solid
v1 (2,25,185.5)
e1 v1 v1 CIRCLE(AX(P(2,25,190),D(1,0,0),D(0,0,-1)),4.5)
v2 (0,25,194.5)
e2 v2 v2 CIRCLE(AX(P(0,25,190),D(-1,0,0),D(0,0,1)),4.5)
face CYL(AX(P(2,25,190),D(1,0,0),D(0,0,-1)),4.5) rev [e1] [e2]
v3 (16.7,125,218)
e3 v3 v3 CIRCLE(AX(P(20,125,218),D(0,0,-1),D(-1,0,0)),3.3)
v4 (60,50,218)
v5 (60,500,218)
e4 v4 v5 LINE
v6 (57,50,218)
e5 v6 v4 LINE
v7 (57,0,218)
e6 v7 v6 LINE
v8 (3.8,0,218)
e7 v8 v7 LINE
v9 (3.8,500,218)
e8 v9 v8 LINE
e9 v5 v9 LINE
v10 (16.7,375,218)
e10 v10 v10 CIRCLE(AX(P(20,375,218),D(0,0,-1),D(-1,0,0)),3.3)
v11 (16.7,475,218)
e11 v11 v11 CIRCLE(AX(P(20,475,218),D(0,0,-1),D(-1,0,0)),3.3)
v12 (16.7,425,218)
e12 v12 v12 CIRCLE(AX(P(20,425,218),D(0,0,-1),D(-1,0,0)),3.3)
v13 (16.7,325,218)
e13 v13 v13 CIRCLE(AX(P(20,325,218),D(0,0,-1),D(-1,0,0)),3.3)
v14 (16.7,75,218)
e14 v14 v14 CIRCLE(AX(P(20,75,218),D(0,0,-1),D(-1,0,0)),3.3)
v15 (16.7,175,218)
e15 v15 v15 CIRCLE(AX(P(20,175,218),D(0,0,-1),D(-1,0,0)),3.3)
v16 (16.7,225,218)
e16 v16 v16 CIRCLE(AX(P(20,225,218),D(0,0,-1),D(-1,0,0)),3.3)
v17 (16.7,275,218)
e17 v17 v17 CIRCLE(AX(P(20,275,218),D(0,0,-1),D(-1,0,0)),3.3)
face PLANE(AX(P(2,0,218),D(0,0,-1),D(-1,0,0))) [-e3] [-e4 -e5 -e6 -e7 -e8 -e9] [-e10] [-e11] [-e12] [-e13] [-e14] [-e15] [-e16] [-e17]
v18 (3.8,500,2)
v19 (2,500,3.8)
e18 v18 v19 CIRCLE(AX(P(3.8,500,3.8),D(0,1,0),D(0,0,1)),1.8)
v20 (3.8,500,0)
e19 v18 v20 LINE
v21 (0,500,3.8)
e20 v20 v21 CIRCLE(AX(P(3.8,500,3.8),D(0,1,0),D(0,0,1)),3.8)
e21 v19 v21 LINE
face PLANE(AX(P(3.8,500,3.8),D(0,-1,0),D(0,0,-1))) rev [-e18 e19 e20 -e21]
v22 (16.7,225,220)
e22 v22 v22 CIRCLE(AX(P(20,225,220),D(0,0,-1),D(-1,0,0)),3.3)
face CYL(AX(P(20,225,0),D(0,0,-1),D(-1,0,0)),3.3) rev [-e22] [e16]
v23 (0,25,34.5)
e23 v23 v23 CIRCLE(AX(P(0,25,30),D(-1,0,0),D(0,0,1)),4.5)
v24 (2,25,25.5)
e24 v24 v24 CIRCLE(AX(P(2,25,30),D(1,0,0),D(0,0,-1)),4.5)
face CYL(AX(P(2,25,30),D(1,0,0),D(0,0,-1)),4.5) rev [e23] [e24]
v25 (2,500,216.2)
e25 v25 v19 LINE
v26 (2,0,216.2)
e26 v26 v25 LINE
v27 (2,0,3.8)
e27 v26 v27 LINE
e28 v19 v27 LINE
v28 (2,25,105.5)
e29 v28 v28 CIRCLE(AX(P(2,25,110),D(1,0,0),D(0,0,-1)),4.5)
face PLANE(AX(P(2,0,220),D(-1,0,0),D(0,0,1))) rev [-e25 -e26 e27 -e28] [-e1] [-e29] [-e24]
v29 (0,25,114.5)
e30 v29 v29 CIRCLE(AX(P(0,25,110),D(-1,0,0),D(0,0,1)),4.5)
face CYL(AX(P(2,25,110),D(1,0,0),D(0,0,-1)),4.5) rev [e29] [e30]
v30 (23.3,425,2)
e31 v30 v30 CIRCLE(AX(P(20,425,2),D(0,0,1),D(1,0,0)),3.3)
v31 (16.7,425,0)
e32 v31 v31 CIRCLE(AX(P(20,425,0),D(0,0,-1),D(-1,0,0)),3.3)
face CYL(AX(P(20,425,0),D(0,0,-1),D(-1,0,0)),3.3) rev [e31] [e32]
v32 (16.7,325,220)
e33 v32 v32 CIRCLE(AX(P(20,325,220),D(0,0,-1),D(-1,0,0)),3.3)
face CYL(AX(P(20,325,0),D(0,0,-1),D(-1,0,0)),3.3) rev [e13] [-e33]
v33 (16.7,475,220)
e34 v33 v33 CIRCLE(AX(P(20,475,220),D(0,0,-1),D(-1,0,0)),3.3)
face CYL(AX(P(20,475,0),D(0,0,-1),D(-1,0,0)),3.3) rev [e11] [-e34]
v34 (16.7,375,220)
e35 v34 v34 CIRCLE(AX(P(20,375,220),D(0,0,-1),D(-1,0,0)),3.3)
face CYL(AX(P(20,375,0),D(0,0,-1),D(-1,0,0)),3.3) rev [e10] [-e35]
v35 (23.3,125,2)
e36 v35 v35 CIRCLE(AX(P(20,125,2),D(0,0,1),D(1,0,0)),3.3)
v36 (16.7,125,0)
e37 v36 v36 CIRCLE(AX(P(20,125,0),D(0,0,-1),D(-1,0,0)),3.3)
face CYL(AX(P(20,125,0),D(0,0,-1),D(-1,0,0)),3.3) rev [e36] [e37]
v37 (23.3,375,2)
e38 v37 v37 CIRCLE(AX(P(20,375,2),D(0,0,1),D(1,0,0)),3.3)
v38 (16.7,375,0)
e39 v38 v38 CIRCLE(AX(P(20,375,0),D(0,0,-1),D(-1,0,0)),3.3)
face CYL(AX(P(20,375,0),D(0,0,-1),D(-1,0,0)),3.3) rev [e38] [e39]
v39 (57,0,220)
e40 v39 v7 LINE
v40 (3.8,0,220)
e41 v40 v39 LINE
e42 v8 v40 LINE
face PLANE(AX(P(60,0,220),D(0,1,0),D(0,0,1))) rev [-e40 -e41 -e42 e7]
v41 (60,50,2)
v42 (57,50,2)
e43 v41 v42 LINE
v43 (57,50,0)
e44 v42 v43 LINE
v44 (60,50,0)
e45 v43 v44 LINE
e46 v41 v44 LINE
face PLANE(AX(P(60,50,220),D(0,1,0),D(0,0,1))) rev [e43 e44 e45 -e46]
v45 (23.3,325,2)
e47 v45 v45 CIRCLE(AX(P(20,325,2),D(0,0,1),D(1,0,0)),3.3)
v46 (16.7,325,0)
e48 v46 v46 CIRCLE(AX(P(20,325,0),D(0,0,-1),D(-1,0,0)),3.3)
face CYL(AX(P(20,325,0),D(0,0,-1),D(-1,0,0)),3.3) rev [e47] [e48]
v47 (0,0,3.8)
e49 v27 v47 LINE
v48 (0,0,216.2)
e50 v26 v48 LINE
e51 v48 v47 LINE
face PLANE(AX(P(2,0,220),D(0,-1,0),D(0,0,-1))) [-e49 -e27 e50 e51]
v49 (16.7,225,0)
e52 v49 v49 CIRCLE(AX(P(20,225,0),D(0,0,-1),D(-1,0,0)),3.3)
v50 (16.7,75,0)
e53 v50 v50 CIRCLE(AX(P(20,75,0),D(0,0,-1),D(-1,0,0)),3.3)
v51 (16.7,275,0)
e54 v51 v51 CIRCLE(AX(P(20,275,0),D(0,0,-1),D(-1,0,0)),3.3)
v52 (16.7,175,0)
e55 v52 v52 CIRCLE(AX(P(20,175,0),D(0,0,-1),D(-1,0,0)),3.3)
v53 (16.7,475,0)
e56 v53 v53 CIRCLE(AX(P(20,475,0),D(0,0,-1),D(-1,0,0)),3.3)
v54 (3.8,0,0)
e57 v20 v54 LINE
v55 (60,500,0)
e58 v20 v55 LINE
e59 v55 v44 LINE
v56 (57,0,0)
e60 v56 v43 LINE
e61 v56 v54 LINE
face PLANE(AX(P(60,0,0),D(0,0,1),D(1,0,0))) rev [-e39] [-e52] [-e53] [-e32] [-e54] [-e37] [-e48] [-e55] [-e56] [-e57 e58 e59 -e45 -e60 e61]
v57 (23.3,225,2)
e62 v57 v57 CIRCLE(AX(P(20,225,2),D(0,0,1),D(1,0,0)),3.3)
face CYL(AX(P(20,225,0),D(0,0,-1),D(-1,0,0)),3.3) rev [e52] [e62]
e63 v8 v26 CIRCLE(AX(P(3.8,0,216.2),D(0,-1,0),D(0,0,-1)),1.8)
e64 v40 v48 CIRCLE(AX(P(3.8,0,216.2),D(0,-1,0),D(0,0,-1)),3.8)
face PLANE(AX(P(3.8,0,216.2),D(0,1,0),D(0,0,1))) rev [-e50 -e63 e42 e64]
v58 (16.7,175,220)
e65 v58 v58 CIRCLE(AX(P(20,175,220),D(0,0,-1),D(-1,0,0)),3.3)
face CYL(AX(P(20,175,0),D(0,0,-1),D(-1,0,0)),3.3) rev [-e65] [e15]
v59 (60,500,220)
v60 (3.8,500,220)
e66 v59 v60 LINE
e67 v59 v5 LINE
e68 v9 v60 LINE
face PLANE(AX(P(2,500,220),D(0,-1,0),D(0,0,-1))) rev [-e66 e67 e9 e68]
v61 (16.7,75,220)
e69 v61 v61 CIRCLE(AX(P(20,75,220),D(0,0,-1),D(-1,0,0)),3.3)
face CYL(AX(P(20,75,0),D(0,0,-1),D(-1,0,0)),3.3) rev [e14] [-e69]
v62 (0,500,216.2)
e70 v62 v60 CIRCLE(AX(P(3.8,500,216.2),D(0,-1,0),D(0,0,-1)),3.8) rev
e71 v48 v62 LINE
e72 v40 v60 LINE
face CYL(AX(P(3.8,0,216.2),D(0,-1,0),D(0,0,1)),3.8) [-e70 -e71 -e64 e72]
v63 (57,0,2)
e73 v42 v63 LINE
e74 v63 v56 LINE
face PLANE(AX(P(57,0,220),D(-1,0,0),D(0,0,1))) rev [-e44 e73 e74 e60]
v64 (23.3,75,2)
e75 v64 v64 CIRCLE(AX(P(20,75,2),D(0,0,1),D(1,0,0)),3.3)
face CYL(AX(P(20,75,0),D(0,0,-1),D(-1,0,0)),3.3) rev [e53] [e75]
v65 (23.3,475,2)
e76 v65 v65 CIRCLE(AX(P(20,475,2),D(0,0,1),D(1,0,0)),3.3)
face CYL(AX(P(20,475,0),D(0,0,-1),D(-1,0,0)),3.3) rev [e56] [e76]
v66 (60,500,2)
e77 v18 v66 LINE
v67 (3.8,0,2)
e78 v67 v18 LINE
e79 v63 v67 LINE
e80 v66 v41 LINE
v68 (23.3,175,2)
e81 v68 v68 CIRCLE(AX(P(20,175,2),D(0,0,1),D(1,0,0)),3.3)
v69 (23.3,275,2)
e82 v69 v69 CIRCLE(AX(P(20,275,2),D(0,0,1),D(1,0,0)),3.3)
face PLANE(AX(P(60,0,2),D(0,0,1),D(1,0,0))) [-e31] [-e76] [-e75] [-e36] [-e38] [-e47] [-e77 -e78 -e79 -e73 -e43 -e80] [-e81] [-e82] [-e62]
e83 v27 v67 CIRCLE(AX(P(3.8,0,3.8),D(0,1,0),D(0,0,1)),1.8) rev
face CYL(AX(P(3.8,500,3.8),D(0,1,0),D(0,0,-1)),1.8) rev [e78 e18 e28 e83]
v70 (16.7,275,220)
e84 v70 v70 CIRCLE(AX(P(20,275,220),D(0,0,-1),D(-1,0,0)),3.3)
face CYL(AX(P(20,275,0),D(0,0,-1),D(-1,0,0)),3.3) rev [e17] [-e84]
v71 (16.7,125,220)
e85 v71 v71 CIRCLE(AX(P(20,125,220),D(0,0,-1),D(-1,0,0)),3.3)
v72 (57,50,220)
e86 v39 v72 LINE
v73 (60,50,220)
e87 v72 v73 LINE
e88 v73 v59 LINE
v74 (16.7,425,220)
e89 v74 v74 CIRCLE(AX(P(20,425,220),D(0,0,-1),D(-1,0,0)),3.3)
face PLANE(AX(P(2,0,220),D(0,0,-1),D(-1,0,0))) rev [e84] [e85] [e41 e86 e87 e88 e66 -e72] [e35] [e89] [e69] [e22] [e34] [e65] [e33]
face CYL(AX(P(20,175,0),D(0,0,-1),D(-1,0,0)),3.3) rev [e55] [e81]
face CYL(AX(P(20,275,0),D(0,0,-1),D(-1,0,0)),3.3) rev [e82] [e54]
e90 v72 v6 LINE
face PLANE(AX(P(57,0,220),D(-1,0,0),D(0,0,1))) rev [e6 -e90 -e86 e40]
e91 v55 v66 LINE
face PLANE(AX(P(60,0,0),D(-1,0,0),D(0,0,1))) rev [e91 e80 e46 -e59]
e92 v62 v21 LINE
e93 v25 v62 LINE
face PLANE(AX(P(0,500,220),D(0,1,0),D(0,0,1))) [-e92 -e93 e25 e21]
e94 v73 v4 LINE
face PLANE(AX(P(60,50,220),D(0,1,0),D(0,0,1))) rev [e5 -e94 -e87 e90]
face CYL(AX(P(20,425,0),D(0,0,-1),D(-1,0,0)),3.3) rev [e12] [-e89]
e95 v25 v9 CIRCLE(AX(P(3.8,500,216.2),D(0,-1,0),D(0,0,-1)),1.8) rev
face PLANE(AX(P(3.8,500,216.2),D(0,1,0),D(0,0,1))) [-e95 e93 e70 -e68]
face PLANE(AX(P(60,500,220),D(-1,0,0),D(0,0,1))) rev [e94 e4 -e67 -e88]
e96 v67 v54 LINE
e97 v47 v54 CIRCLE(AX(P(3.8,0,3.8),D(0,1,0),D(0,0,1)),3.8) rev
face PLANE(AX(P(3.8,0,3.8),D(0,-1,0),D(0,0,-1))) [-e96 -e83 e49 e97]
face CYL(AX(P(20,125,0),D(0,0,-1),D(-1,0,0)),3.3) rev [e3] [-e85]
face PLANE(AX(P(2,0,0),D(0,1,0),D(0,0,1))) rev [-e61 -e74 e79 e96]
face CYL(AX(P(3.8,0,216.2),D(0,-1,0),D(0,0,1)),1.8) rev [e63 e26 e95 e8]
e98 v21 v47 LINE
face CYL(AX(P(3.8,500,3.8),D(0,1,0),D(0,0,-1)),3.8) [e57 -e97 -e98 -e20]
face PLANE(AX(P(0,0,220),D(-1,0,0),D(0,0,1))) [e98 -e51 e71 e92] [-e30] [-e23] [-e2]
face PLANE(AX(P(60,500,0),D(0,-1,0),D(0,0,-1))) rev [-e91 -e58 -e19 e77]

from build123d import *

# Parameters (mm, degrees)
SKETCH_1_W                         = 2
SKETCH_1_H                         = 500
SM_BASE_FLANGE_1_DEPTH             = 220
SM_EDGE_FLANGE_1_STRIP_W           = 11.6
SM_EDGE_FLANGE_1_STRIP_H           = 2
SM_EDGE_FLANGE_1_STRIP_CUT_DEPTH   = 500
SM_EDGE_FLANGE_1_STRIP_2_W         = 11.6
SM_EDGE_FLANGE_1_STRIP_2_H         = 2
SM_EDGE_FLANGE_1_STRIP_CUT_2_DEPTH = 500
SM_EDGE_FLANGE_1_DEPTH             = 500
SM_EDGE_FLANGE_1_BEND_DEPTH        = 500
SKETCH_10_W                        = 3
SKETCH_10_H                        = 50
CUT_EXTRUDE_1_DEPTH                = 550.545266561
HOLE_WIZARD_M81_D                  = 9
HOLE_WIZARD_M81_DEPTH              = 5
HOLE_WIZARD_M81_TIP                = 2.703872786
HOLE_WIZARD_M61_D                  = 6.6


# Sheet-metal steps are written as plain solids
with BuildPart() as part:
    # Sketch 1 → Базовая кромка1 (new body)
    with BuildSketch(Plane.XY):
        with Locations((1, 250)):
            Rectangle(SKETCH_1_W, SKETCH_1_H)
    extrude(amount=SM_BASE_FLANGE_1_DEPTH)

    # Ребро-кромка1 strip (across the edge) → Ребро-кромка1 strip cut (cut)
    with BuildSketch(Plane(origin=(2, 0, 0), x_dir=(0, 0, 1), z_dir=(0, 1, 0))):
        with Locations((-2, -1)):
            Rectangle(SM_EDGE_FLANGE_1_STRIP_W, SM_EDGE_FLANGE_1_STRIP_H)
    extrude(amount=SM_EDGE_FLANGE_1_STRIP_CUT_DEPTH, mode=Mode.SUBTRACT)

    # Ребро-кромка1 strip 2 (across the edge) → Ребро-кромка1 strip cut 2 (cut)
    with BuildSketch(Plane(origin=(2, 500, 220), x_dir=(0, 0, -1), z_dir=(0, -1, 0))):
        with Locations((-2, -1)):
            Rectangle(SM_EDGE_FLANGE_1_STRIP_2_W, SM_EDGE_FLANGE_1_STRIP_2_H)
    extrude(amount=SM_EDGE_FLANGE_1_STRIP_CUT_2_DEPTH, mode=Mode.SUBTRACT)

    # Ребро-кромка1 section (across the edge) → Ребро-кромка1 (add)
    with BuildSketch(Plane(origin=(2, 0, 0), x_dir=(0, 0, 1), z_dir=(0, 1, 0))):
        with BuildLine():
            Line((0, 1.8), (0, 58))
            Line((0, 58), (2, 58))
            Line((2, 58), (2, 1.8))
            ThreePointArc((2, 1.8), (2.527207794, 0.527207794), (3.8, 0))
            Line((3.8, 0), (3.8, -2))
            ThreePointArc((3.8, -2), (1.112994231, -0.887005769), (0, 1.8))
        make_face()
    extrude(amount=SM_EDGE_FLANGE_1_DEPTH)

    # Ребро-кромка1 section 2 (across the edge) → Ребро-кромка1 bend (add)
    with BuildSketch(Plane(origin=(2, 500, 220), x_dir=(0, 0, -1), z_dir=(0, -1, 0))):
        with BuildLine():
            Line((0, 1.8), (0, 58))
            Line((0, 58), (2, 58))
            Line((2, 58), (2, 1.8))
            ThreePointArc((2, 1.8), (2.527207794, 0.527207794), (3.8, 0))
            Line((3.8, 0), (3.8, -2))
            ThreePointArc((3.8, -2), (1.112994231, -0.887005769), (0, 1.8))
        make_face()
    extrude(amount=SM_EDGE_FLANGE_1_BEND_DEPTH)

    # Эскиз10 → Вырез-Вытянуть1 (cut, through all)
    with BuildSketch(Plane(origin=(0, 0, 0), x_dir=(-1, 0, 0), z_dir=(0, 0, -1))):
        with Locations((-58.5, 25)):
            Rectangle(SKETCH_10_W, SKETCH_10_H)
    extrude(amount=-CUT_EXTRUDE_1_DEPTH, mode=Mode.SUBTRACT)

    # Отверстие с зазором M81
    with Locations(Plane(origin=(2, 0, 0), x_dir=(0, 0, -1), z_dir=(1, 0, 0))):
        with Locations((-30, 25), (-110, 25), (-190, 25)):
            Hole(HOLE_WIZARD_M81_D / 2, depth=HOLE_WIZARD_M81_DEPTH)
            with Locations((0, 0, -(HOLE_WIZARD_M81_DEPTH + HOLE_WIZARD_M81_TIP / 2))):  # 118° drill point
                Cone(0, HOLE_WIZARD_M81_D / 2, HOLE_WIZARD_M81_TIP, mode=Mode.SUBTRACT)

    # Отверстие с зазором M61 (through all)
    with Locations(Plane(origin=(0, 0, 0), x_dir=(-1, 0, 0), z_dir=(0, 0, -1))):
        with Locations((-20, 475), (-20, 425), (-20, 375), (-20, 325), (-20, 275), (-20, 225), (-20, 175), (-20, 125), (-20, 75)):
            Hole(HOLE_WIZARD_M61_D / 2)


solid = part.part
